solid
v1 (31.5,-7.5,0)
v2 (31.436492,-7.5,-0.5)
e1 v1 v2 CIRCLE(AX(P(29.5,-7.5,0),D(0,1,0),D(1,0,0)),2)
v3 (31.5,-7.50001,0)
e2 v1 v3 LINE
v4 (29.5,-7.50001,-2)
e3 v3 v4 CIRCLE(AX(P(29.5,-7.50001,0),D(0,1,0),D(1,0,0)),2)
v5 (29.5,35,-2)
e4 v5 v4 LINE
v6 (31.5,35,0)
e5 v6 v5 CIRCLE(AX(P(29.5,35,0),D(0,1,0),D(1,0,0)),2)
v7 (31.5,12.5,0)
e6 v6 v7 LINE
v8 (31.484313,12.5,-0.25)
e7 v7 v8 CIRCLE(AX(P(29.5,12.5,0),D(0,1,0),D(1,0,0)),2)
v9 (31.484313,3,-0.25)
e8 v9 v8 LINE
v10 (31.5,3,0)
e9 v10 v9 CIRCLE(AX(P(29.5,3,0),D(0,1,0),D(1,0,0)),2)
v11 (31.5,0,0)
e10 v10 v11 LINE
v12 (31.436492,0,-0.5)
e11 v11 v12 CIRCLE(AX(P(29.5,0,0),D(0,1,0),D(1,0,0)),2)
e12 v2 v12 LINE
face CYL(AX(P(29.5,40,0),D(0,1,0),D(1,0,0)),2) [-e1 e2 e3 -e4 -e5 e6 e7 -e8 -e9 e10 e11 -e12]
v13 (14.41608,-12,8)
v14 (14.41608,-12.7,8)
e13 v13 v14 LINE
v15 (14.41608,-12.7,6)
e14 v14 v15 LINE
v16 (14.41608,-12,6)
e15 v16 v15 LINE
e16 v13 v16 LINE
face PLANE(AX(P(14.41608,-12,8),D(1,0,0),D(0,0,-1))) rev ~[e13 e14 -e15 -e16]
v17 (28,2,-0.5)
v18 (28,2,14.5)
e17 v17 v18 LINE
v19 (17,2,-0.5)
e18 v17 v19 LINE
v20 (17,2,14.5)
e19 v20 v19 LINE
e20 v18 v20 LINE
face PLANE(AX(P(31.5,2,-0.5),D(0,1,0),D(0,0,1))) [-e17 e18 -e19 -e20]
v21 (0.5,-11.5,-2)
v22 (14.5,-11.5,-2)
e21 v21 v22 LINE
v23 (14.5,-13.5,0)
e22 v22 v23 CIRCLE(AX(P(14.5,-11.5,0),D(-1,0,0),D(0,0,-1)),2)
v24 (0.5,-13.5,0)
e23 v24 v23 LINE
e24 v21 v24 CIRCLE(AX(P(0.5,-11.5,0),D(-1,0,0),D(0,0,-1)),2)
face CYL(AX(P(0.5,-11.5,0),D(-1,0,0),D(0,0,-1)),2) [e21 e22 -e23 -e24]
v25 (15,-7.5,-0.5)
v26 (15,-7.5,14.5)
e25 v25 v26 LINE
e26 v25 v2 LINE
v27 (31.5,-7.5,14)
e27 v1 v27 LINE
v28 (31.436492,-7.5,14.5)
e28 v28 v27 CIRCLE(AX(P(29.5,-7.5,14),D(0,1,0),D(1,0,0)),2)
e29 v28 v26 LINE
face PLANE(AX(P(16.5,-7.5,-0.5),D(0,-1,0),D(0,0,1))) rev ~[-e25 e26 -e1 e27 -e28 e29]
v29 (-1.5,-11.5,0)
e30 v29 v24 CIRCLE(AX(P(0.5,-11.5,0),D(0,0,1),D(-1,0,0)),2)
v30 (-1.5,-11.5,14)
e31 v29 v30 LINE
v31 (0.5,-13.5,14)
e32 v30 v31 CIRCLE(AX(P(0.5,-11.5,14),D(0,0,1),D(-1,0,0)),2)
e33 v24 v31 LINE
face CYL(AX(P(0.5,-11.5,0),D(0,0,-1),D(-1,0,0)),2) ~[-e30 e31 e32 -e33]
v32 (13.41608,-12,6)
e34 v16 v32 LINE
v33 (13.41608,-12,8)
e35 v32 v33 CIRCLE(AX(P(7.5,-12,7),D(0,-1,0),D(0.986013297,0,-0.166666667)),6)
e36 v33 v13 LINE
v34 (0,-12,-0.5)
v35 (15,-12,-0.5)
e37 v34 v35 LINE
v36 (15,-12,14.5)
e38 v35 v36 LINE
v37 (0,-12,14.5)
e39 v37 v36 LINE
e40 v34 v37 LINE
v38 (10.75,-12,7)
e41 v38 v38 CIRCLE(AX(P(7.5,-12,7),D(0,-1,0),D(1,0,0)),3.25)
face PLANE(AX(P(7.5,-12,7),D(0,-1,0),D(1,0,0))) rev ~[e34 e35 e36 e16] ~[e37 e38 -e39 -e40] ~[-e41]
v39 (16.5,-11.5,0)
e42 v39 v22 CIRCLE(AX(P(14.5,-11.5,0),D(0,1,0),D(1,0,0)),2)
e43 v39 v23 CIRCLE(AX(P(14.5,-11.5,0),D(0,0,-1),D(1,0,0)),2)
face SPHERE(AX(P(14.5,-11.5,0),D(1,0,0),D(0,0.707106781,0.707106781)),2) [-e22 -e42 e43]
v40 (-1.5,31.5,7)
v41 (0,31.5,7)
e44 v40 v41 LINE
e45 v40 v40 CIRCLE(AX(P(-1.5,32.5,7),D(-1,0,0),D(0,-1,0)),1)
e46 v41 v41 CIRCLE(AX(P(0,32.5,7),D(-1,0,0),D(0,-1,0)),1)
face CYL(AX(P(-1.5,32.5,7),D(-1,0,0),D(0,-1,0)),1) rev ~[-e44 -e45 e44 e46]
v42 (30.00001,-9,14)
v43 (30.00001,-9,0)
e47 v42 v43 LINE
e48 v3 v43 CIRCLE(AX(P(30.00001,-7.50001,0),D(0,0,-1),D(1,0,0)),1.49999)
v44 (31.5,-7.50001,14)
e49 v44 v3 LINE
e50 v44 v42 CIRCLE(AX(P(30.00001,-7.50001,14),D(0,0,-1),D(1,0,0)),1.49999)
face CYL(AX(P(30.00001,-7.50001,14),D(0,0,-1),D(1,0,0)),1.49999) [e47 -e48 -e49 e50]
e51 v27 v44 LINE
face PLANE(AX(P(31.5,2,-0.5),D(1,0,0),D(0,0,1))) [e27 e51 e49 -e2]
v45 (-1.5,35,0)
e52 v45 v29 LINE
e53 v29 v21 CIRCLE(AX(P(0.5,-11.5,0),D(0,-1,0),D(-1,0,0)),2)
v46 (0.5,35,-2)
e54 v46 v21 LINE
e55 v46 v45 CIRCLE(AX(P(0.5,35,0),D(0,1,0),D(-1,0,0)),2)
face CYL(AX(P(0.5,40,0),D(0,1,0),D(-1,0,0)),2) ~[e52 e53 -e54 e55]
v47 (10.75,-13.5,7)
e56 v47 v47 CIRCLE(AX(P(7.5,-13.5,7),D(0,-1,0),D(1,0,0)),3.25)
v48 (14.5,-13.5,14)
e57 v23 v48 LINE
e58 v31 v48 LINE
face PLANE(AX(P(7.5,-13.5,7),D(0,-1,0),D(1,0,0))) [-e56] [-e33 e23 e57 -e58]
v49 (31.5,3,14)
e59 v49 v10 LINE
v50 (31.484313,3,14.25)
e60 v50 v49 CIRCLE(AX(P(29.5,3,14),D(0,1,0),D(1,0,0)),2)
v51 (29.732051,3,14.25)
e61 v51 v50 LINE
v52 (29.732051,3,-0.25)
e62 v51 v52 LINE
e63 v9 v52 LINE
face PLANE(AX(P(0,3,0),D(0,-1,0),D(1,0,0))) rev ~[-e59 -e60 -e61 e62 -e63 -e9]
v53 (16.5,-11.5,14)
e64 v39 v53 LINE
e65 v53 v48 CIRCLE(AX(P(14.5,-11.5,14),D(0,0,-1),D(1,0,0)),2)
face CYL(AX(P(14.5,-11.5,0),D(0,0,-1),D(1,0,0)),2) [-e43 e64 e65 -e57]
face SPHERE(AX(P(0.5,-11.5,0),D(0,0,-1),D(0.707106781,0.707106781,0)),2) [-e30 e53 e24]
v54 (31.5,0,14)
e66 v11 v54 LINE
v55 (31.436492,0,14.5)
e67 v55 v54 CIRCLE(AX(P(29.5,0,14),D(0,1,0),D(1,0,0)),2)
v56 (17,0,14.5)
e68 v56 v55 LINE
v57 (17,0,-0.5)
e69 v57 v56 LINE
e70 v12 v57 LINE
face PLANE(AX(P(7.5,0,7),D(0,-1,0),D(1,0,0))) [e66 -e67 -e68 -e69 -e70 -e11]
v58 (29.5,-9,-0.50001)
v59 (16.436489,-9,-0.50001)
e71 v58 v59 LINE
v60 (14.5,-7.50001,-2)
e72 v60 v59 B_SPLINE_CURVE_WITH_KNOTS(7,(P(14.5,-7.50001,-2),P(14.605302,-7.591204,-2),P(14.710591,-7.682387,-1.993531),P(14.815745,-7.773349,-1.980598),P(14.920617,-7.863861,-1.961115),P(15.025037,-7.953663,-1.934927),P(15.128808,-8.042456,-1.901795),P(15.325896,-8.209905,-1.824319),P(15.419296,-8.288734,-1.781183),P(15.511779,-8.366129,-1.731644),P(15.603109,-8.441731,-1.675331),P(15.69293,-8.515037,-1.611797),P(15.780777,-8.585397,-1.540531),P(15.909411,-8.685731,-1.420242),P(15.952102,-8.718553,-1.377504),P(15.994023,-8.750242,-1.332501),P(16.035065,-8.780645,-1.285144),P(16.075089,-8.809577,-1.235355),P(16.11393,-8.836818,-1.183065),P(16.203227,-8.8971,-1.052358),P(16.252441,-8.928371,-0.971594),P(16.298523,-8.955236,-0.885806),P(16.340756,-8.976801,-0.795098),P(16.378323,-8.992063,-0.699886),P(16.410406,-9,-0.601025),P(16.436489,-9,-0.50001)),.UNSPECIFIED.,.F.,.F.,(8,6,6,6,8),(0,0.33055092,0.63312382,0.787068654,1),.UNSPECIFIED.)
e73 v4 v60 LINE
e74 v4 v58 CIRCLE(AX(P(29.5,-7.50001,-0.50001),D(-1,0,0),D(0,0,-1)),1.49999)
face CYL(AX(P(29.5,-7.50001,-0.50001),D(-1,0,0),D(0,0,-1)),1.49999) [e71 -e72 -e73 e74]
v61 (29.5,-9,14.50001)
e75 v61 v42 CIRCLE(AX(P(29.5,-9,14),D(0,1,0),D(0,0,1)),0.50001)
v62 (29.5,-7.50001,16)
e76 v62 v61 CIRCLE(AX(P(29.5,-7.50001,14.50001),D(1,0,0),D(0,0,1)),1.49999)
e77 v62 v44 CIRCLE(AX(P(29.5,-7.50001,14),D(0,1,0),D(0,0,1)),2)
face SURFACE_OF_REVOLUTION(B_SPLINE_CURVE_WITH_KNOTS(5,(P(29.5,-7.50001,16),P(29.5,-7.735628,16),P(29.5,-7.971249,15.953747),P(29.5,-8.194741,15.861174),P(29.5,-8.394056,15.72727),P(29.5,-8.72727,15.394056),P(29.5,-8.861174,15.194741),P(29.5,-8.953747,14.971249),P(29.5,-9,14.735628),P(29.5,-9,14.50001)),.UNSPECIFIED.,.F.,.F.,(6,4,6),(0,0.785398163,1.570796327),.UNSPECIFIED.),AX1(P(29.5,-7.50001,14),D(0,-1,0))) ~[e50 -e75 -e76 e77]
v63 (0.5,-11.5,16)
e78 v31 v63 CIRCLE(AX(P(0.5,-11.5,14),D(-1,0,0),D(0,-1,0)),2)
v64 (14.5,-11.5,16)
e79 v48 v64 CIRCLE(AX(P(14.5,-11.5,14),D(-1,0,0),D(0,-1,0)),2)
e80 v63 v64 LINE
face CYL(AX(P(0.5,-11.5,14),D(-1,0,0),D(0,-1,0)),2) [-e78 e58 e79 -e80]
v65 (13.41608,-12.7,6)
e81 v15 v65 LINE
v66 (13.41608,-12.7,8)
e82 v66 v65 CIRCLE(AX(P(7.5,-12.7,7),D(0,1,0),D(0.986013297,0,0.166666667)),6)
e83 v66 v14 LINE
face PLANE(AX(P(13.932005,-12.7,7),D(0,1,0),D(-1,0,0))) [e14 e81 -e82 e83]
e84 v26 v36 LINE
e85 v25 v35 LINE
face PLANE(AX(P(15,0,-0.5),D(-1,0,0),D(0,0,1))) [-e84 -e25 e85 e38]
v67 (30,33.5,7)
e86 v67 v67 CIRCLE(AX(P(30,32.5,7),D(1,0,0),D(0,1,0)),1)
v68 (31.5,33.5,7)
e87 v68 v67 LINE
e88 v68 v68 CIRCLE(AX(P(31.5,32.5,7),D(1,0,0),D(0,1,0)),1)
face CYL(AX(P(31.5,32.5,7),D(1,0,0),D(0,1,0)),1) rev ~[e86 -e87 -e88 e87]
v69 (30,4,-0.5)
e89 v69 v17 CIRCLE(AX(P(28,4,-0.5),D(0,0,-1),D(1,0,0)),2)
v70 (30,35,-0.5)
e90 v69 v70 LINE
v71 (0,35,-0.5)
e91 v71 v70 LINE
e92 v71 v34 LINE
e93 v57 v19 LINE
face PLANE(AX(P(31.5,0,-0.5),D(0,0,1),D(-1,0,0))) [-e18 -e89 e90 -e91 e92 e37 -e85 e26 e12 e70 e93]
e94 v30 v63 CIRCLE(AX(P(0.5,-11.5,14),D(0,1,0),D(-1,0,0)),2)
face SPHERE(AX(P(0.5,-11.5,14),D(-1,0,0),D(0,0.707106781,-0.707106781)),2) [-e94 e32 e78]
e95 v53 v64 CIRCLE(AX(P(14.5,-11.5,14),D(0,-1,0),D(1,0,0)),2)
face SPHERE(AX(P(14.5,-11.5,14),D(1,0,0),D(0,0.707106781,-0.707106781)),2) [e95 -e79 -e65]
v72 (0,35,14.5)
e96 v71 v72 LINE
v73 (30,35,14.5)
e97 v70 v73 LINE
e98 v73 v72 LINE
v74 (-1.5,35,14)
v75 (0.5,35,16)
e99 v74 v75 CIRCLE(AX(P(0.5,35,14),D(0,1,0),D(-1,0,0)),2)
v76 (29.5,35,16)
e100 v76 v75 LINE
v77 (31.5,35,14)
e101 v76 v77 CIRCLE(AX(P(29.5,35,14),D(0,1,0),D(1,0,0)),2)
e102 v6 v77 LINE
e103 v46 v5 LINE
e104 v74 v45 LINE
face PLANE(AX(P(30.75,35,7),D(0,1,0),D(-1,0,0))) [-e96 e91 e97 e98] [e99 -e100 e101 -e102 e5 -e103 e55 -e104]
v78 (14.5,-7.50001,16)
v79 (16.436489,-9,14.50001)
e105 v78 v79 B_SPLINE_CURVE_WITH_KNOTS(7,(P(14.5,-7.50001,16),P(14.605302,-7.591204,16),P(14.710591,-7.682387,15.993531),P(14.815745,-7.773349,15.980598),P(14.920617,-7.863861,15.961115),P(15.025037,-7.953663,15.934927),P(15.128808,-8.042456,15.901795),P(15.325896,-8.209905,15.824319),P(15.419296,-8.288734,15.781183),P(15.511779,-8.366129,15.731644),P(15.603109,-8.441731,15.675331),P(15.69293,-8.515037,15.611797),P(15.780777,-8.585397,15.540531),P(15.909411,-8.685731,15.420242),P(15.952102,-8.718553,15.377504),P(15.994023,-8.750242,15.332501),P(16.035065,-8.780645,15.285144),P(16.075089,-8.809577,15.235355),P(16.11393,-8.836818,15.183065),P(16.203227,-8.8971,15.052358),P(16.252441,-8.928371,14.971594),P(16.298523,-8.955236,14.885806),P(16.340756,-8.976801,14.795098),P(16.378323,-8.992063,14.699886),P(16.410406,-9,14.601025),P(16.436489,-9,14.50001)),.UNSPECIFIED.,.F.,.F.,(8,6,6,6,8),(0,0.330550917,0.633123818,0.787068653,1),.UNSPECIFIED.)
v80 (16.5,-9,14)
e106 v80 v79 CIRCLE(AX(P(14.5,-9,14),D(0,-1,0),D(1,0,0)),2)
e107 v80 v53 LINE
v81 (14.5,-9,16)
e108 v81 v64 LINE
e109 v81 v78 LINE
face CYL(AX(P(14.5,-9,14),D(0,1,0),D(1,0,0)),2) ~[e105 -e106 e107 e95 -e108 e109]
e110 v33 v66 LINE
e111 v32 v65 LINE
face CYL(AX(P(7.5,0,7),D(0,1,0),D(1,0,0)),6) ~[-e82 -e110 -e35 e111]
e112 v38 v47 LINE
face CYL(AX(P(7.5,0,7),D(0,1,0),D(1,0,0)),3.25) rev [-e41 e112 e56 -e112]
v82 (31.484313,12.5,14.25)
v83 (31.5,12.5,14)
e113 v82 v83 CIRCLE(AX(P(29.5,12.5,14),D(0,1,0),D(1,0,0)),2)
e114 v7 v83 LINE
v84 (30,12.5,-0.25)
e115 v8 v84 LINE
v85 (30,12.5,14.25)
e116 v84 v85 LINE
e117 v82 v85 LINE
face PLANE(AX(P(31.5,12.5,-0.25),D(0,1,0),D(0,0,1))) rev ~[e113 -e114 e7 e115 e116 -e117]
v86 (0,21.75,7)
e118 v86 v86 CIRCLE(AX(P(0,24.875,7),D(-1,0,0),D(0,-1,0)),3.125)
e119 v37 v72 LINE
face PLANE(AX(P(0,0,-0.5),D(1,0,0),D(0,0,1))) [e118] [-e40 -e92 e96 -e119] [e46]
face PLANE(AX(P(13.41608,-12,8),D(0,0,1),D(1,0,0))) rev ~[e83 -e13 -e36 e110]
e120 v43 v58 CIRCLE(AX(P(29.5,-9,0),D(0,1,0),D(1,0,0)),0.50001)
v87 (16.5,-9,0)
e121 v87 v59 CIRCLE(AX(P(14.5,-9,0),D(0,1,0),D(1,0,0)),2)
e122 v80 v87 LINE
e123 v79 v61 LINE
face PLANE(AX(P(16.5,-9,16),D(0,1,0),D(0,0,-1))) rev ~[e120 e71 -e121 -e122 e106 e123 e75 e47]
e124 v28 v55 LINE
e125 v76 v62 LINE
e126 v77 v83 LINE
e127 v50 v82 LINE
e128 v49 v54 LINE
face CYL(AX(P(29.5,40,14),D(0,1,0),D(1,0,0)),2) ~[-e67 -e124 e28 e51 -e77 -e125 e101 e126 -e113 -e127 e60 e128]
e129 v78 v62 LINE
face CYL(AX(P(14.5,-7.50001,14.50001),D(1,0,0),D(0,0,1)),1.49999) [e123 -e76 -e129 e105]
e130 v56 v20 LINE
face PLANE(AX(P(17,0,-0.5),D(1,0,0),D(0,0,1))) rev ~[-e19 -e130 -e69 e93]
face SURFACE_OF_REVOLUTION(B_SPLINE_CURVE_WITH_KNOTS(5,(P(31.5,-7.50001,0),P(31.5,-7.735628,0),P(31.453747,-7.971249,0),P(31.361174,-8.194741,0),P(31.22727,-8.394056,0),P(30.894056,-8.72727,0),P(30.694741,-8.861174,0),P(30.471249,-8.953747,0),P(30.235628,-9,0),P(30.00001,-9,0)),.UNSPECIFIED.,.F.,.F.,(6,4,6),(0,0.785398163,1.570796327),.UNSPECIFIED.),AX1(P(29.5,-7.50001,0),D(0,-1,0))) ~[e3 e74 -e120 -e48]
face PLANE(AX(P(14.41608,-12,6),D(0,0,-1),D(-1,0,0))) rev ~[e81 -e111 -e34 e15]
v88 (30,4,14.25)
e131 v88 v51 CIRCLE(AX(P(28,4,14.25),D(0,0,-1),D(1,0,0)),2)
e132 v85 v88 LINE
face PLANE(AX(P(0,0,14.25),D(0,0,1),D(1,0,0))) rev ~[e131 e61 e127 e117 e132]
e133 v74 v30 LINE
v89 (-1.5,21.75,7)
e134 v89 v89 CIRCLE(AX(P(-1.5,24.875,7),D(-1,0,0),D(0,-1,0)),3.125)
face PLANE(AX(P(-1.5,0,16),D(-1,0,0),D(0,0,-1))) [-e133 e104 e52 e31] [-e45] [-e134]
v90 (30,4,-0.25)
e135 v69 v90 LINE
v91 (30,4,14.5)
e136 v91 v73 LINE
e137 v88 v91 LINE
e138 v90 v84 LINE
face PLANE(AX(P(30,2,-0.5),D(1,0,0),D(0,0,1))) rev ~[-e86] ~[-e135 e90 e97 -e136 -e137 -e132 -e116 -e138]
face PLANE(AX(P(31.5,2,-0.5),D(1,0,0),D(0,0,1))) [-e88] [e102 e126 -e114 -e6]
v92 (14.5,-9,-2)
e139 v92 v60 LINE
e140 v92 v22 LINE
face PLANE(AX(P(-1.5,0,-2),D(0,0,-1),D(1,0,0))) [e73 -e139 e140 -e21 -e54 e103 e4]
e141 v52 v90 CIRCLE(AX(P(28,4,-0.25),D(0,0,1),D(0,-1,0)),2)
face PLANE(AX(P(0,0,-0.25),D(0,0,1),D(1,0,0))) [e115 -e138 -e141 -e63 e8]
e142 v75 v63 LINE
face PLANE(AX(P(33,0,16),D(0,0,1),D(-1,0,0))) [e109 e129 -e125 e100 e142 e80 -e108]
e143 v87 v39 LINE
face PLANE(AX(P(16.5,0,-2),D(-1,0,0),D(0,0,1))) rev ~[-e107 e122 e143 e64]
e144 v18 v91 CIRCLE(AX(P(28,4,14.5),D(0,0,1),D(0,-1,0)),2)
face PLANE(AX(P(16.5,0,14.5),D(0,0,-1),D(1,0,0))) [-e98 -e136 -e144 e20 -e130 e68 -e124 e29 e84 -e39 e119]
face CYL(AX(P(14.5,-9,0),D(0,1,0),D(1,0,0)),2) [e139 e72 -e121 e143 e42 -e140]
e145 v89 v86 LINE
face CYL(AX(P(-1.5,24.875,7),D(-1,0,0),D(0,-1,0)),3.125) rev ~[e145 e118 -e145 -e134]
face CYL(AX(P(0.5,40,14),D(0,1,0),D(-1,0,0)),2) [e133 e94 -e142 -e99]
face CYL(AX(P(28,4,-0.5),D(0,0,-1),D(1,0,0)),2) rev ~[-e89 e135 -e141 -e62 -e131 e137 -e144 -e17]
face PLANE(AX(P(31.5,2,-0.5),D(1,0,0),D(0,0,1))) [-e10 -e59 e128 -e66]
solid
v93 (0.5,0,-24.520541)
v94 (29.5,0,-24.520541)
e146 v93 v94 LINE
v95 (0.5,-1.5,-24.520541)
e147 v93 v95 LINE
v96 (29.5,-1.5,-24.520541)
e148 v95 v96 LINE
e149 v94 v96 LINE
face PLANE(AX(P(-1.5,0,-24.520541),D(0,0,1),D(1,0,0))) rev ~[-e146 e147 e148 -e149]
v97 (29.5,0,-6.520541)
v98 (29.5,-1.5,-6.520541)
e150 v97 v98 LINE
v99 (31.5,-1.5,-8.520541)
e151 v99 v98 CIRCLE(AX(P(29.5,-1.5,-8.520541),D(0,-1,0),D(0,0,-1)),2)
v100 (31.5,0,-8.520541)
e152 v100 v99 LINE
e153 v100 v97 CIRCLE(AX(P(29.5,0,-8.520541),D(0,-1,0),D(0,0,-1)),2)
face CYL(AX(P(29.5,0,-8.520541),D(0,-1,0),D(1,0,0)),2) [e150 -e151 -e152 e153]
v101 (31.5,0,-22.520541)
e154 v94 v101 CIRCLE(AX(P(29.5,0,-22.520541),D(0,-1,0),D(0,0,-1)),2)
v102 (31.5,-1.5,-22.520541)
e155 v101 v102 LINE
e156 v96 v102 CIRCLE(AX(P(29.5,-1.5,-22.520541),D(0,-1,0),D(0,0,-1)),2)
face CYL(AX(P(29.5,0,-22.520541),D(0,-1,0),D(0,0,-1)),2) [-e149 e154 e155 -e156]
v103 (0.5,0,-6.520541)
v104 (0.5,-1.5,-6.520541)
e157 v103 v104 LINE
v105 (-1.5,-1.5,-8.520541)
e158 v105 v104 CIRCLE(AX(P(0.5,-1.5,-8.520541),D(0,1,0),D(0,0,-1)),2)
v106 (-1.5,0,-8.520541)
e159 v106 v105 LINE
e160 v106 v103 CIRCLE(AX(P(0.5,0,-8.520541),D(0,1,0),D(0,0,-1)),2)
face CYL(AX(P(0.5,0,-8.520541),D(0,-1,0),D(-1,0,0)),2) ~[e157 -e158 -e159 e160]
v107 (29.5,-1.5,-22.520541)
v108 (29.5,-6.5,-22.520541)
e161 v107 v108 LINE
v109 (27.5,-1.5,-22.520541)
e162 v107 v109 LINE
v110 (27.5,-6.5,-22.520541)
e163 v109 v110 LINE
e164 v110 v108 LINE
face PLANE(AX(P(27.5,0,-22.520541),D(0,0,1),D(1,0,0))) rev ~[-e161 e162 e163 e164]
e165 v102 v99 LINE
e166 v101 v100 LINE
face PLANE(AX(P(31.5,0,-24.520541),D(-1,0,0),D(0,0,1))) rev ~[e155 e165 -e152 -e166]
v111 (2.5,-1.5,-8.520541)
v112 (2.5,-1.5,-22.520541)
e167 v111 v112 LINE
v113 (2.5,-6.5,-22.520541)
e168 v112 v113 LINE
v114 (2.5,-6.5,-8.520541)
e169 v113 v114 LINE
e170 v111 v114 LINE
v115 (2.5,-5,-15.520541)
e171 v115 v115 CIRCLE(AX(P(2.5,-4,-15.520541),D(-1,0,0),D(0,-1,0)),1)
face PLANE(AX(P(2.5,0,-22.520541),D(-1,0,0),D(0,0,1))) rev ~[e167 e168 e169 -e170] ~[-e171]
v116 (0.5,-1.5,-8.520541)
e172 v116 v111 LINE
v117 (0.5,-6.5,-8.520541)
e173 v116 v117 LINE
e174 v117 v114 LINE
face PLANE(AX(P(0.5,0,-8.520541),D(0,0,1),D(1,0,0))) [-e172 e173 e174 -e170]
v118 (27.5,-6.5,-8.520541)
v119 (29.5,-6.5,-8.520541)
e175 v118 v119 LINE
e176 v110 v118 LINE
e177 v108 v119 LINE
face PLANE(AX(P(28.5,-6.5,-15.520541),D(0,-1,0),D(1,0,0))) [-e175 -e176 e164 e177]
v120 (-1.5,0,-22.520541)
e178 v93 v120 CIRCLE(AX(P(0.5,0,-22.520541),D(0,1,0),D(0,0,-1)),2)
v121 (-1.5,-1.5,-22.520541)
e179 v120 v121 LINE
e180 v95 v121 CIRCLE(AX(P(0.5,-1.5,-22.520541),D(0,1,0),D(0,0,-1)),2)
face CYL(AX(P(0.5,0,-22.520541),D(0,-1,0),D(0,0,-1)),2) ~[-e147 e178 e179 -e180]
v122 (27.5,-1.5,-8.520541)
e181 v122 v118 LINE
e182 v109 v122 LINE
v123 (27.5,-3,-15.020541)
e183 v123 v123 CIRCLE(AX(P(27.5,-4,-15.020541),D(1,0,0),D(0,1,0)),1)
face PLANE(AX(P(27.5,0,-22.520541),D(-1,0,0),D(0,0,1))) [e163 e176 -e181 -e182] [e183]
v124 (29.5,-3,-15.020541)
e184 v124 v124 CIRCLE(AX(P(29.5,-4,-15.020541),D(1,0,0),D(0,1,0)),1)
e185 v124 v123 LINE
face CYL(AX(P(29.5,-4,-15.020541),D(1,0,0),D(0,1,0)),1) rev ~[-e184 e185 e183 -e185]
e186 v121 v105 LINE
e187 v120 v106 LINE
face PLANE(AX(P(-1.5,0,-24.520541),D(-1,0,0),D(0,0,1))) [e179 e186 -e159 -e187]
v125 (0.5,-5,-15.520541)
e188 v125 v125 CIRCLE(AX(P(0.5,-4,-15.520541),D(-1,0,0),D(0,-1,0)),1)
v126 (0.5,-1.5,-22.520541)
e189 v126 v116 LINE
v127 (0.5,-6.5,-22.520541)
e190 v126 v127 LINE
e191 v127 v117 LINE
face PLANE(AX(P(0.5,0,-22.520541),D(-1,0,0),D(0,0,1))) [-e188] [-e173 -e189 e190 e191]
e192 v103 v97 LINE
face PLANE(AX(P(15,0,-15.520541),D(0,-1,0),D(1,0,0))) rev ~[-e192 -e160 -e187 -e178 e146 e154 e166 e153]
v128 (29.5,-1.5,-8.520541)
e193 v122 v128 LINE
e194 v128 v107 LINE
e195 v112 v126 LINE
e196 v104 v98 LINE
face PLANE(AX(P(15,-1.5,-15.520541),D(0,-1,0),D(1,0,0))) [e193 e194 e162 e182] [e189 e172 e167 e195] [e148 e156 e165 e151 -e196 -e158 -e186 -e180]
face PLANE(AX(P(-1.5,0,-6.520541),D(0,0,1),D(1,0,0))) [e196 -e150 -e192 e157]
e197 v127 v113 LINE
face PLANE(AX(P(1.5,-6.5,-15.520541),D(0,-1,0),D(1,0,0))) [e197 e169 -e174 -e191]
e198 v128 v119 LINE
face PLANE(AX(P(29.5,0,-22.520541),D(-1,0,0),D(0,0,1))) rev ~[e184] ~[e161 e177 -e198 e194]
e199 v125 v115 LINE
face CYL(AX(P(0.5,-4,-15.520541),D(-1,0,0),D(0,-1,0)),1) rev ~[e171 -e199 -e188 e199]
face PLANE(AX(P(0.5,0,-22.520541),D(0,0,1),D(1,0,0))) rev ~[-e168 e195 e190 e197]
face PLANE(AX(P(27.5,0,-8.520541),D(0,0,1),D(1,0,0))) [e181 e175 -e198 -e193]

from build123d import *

# Parameters (mm, degrees)
F0_W          = 15
F0_H          = 15
F1_DEPTH      = 13.5
F0_R          = 6
F2_DEPTH      = 13.5
F0_R_2        = 4.5
F3_DEPTH      = 12
F5_DEPTH      = 15
F6_DEPTH      = 1.5
F7_DEPTH      = 35
F8_W          = 1.5
F8_H          = 15
F9_DEPTH      = 15
F10_W         = 2
F10_H         = 15
F11_DEPTH     = 15
F13_DEPTH     = 35
F14_W         = 1.5
F14_H         = 15
F15_DEPTH     = 33
F16_W         = 33
F16_H         = 18
F17_DEPTH     = 1.5
F16_W_2       = 2
F16_H_2       = 14
F18_DEPTH     = 6.5
F20_R         = 1
F21_DEPTH     = 1.5
F22_R         = 1
F23_DEPTH     = 1.5
F20_R_2       = 3.125
F24_DEPTH     = 1.5
F26_DEPTH     = 0.7
F27_R         = 1
F28_DEPTH     = 2
F29_DEPTH     = 5
F30_DEPTH     = 2
F32_DEPTH     = 13.5
F33_DEPTH     = 12
F0_R_3        = 3.25
F34_DEPTH     = 13.5
F35_DEPTH     = 12
F37_DEPTH     = 1.5
F38_T4_DEPTH  = 15
F38_T10_DEPTH = 15
F38_T16_DEPTH = 15
F38_T23_DEPTH = 15
F38_T29_DEPTH = 15
F38_T32_DEPTH = 2.5
F38_T34_DEPTH = 14
F38_T36_DEPTH = 14
F38_T38_DEPTH = 51.5
F38_T40_DEPTH = 54
F38_S44_W     = 2
F38_S44_H     = 2
F38_T45_DEPTH = 2
F38_S50_W     = 2
F38_S50_H     = 2
F38_T51_DEPTH = 2
F38_S56_W     = 2
F38_S56_H     = 2
F38_T57_DEPTH = 2
F38_S62_W     = 2
F38_S62_H     = 2
F38_T63_DEPTH = 2
F38_2_F1_R    = 2
F38_2_F2_R    = 2
F38_2_F3_R    = 2
F38_2_F4_R    = 2
F19_R         = 1
F40_DEPTH     = 2
F42_R         = 1.49999


# Not quite as in the source:
# - a fillet or chamfer that OpenCascade refuses, or shapes differently, is made with other operations: its cross-section is extruded or revolved along the edge and cut away or added
# - two fillets or chamfers of one size are made in one step
# - a fillet or chamfer is up to 0.001 mm smaller than in the source, because OpenCascade refuses the exact size
# - a feature names something its author has since deleted; it is built from what else it names


with BuildPart() as f1:
    # F0 (on Front) → F1 (new body)
    with BuildSketch(Plane.XZ):
        Polygon((16.5, 14.5), (16.5, 16), (-1.5, 16), (-1.5, -2), (16.5, -2), (16.5, -0.5), align=None)
        with Locations((7.5, 7)):
            Rectangle(F0_W, F0_H, mode=Mode.SUBTRACT)
    extrude(amount=F1_DEPTH)

    # F0 (on Front) → F2 (join)
    with BuildSketch(Plane.XZ):
        with Locations((7.5, 7)):
            Rectangle(F0_W, F0_H)
        with Locations((7.5, 7)):
            Circle(F0_R, mode=Mode.SUBTRACT)
    extrude(amount=F2_DEPTH)

    # F0 (on Front) → F3 (cut)
    with BuildSketch(Plane.XZ):
        with Locations((7.5, 7)):
            Rectangle(F0_W, F0_H)
        with Locations((7.5, 7)):
            Circle(F0_R, mode=Mode.SUBTRACT)
        with Locations((7.5, 7)):
            Circle(F0_R)
        with Locations((7.5, 7)):
            Circle(F0_R_2, mode=Mode.SUBTRACT)
    extrude(amount=F3_DEPTH, mode=Mode.SUBTRACT)

    # F4 (on face) → F5 (join)
    with BuildSketch(Plane.YZ.offset(16.5)):
        Polygon((0, -2), (0, -0.5), (-7.5, -0.5), (-7.5, 14.5), (0, 14.5), (0, 16), (-9, 16), (-9, -2), align=None)
    extrude(amount=F5_DEPTH)

    # F6 (cut): a face of the model
    f6_faces = [f1.faces().sort_by_distance(p)[0] for p in [
        (16.5, -3.75, 7),
    ]]
    extrude(f6_faces, amount=-F6_DEPTH, mode=Mode.SUBTRACT)

    # F0 (on Front) → F7 (join)
    with BuildSketch(Plane.XZ):
        Polygon((16.5, 14.5), (16.5, 16), (-1.5, 16), (-1.5, -2), (16.5, -2), (16.5, -0.5), align=None)
        with Locations((7.5, 7)):
            Rectangle(F0_W, F0_H, mode=Mode.SUBTRACT)
        Polygon((33, 16), (16.5, 16), (16.5, 14.5), (31.5, 14.5), (31.5, -0.5), (16.5, -0.5), (16.5, -2), (33, -2), align=None)
    extrude(amount=-F7_DEPTH)

    # F8 (on face) → F9 (cut)
    with BuildSketch(Plane(origin=(0, 35, 0), x_dir=(-1, 0, 0), z_dir=(0, 1, 0))):
        with Locations((-15.75, 7)):
            Rectangle(F8_W, F8_H)
    extrude(amount=-F9_DEPTH, mode=Mode.SUBTRACT)

    # F10 (on face) → F11 (join)
    with BuildSketch(Plane(origin=(31.5, 0, 0), x_dir=(0, -1, 0), z_dir=(-1, 0, 0))):
        with Locations((-1, 7)):
            Rectangle(F10_W, F10_H)
    extrude(amount=F11_DEPTH)

    # F12 (on face) → F13 (cut)
    with BuildSketch(Plane(origin=(0, 35, 0), x_dir=(-1, 0, 0), z_dir=(0, 1, 0))):
        Polygon((-31.5, -2), (-31.5, -0.5), (-31.5, 14.5), (-31.5, 16), (-33, 16), (-33, -2), align=None)
    extrude(amount=-F13_DEPTH, mode=Mode.SUBTRACT)

    # F14 (on face) → F15 (join)
    with BuildSketch(Plane(origin=(0, 2, 0), x_dir=(-1, 0, 0), z_dir=(0, 1, 0))):
        with Locations((-30.75, 7)):
            Rectangle(F14_W, F14_H)
    extrude(amount=F15_DEPTH)

    # F20 (on face) → F21 (cut)
    with BuildSketch(Plane(origin=(-1.5, 0, 0), x_dir=(0, -1, 0), z_dir=(-1, 0, 0))):
        with Locations((-32.5, 7)):
            Circle(F20_R)
    extrude(amount=-F21_DEPTH, mode=Mode.SUBTRACT)

    # F22 (on face) → F23 (cut)
    with BuildSketch(Plane.YZ.offset(31.5)):
        with Locations((32.5, 7)):
            Circle(F22_R)
    extrude(amount=-F23_DEPTH, mode=Mode.SUBTRACT)

    # F20 (on face) → F24 (cut)
    with BuildSketch(Plane(origin=(-1.5, 0, 0), x_dir=(0, -1, 0), z_dir=(-1, 0, 0))):
        with Locations((-24.875, 7)):
            Circle(F20_R_2)
    extrude(amount=-F24_DEPTH, mode=Mode.SUBTRACT)

    # F25 (on face) → F26 (cut)
    with BuildSketch(Plane(origin=(0, -12, 0), x_dir=(-1, 0, 0), z_dir=(0, 1, 0))):
        with BuildLine():
            Line((-14.4160797831, 6), (-13.4160797831, 6))
            ThreePointArc((-13.4160797831, 6), (-13.5, 7), (-13.4160797831, 8))
            Line((-13.4160797831, 8), (-14.4160797831, 8))
            Line((-14.4160797831, 8), (-14.4160797831, 7))
            Line((-14.4160797831, 7), (-14.4160797831, 6))
        make_face()
    extrude(amount=-F26_DEPTH, mode=Mode.SUBTRACT)

    # F29 (cut): a face of the model
    f29_faces = [f1.faces().sort_by_distance(p)[0] for p in [
        (15.75, 20, 7),
    ]]
    extrude(f29_faces, amount=-F29_DEPTH, mode=Mode.SUBTRACT)

    # F30 (cut): a face of the model
    f30_faces = [f1.faces().sort_by_distance(p)[0] for p in [
        (15, 7.5, 7),
    ]]
    extrude(f30_faces, amount=-F30_DEPTH, mode=Mode.SUBTRACT)

    # F31: union 

    # F0 (on Front) → F32 (join)
    with BuildSketch(Plane.XZ):
        with Locations((7.5, 7)):
            Circle(F0_R)
        with Locations((7.5, 7)):
            Circle(F0_R_2, mode=Mode.SUBTRACT)
    extrude(amount=F32_DEPTH)

    # F0 (on Front) → F33 (cut)
    with BuildSketch(Plane.XZ):
        with Locations((7.5, 7)):
            Circle(F0_R)
        with Locations((7.5, 7)):
            Circle(F0_R_2, mode=Mode.SUBTRACT)
    extrude(amount=F33_DEPTH, mode=Mode.SUBTRACT)

    # F0 (on Front) → F34 (join)
    with BuildSketch(Plane.XZ):
        with Locations((7.5, 7)):
            Circle(F0_R_2)
        with Locations((7.5, 7)):
            Circle(F0_R_3, mode=Mode.SUBTRACT)
    extrude(amount=F34_DEPTH)

    # F0 (on Front) → F35 (cut)
    with BuildSketch(Plane.XZ):
        with Locations((7.5, 7)):
            Circle(F0_R_2)
        with Locations((7.5, 7)):
            Circle(F0_R_3, mode=Mode.SUBTRACT)
    extrude(amount=F35_DEPTH, mode=Mode.SUBTRACT)

    # F36 (on face) → F37 (cut)
    with BuildSketch(Plane.YZ.offset(31.5)):
        Polygon((3, 14.25), (3, 7), (3, -0.25), (7.75, -0.25), (12.5, -0.25), (12.5, 7), (12.5, 14.25), (7.75, 14.25), align=None)
    extrude(amount=-F37_DEPTH, mode=Mode.SUBTRACT)

    # F38: fillet of radius 2 on 11 edges, made by hand


with BuildPart() as f17:
    # F16 (on Front) → F17 (new body)
    with BuildSketch(Plane.XZ):
        with Locations((15, -15.5205413848)):
            Rectangle(F16_W, F16_H)
        Polygon((29.5, -23.0205413848), (0.5, -23.0205413848), (0, -23.0205413848), (0, -8.0205413848), (0.5, -8.0205413848), (29.5, -8.0205413848), (30, -8.0205413848), (30, -23.0205413848), align=None, mode=Mode.SUBTRACT)
        Polygon((0.5, -22.5205413848), (0.5, -23.0205413848), (29.5, -23.0205413848), (29.5, -22.5205413848), (27.5, -22.5205413848), (27.5, -8.5205413848), (29.5, -8.5205413848), (29.5, -8.0205413848), (0.5, -8.0205413848), (0.5, -8.5205413848), (2.5, -8.5205413848), (2.5, -22.5205413848), align=None)
        Polygon((29.5, -22.5205413848), (29.5, -23.0205413848), (30, -23.0205413848), (30, -8.0205413848), (29.5, -8.0205413848), (29.5, -8.5205413848), align=None)
        Polygon((0, -23.0205413848), (0.5, -23.0205413848), (0.5, -22.5205413848), (0.5, -8.5205413848), (0.5, -8.0205413848), (0, -8.0205413848), align=None)
    extrude(amount=F17_DEPTH)

    # F16 (on Front) → F18 (join)
    with BuildSketch(Plane.XZ):
        with Locations((1.5, -15.5205413848)):
            Rectangle(F16_W_2, F16_H_2)
        with Locations((28.5, -15.5205413848)):
            Rectangle(F16_W_2, F16_H_2)
    extrude(amount=F18_DEPTH)

    # F27 (on face) → F28 (cut)
    with BuildSketch(Plane(origin=(0.5, 0, 0), x_dir=(0, -1, 0), z_dir=(-1, 0, 0))):
        with Locations((4, -15.5205413848)):
            Circle(F27_R)
    extrude(amount=-F28_DEPTH, mode=Mode.SUBTRACT)

    # F38#2: fillet of radius 2 on 4 edges, made by hand

    # F38_2_f1
    f38_2_f1_edges = [f17.edges().sort_by_distance(p)[0] for p in [
        (31.5, -0.75, -24.5205413848),
    ]]
    fillet(f38_2_f1_edges, radius=F38_2_F1_R)

    # F38_2_f2
    f38_2_f2_edges = [f17.edges().sort_by_distance(p)[0] for p in [
        (31.5, -0.75, -6.5205413848),
    ]]
    fillet(f38_2_f2_edges, radius=F38_2_F2_R)

    # F38_2_f3
    f38_2_f3_edges = [f17.edges().sort_by_distance(p)[0] for p in [
        (-1.5, -0.75, -24.5205413848),
    ]]
    fillet(f38_2_f3_edges, radius=F38_2_F3_R)

    # F38_2_f4
    f38_2_f4_edges = [f17.edges().sort_by_distance(p)[0] for p in [
        (-1.5, -0.75, -6.5205413848),
    ]]
    fillet(f38_2_f4_edges, radius=F38_2_F4_R)

    # F19 (on face) → F40 (cut)
    with BuildSketch(Plane.YZ.offset(29.5)):
        with Locations((-4, -15.0205413848)):
            Circle(F19_R)
    extrude(amount=-F40_DEPTH, mode=Mode.SUBTRACT)


with BuildPart() as f38_tool2:
    # F38_s3 → F38_t4 (new body)
    with BuildSketch(Plane.XY.offset(-0.5)):
        with BuildLine():
            ThreePointArc((30, 4), (29.4142135624, 2.5857864376), (28, 2))
            Line((28, 2), (30, 2))
            Line((30, 2), (30, 4))
        make_face()
    extrude(amount=F38_T4_DEPTH)

    split(bisect_by=Plane.XZ.offset(-3), keep=Keep.BOTTOM)

    split(bisect_by=Plane.XY.offset(-0.25), keep=Keep.BOTTOM)


with BuildPart() as f1_1:
    add(f1.part)

    # F38_t1: union F38_tool2
    add(f38_tool2.part)


with BuildPart() as f38_tool8:
    # F38_s9 → F38_t10 (new body)
    with BuildSketch(Plane.XY.offset(-0.5)):
        with BuildLine():
            ThreePointArc((30, 4), (29.4142135624, 2.5857864376), (28, 2))
            Line((28, 2), (30, 2))
            Line((30, 2), (30, 4))
        make_face()
    extrude(amount=F38_T10_DEPTH)

    split(bisect_by=Plane.XZ.offset(-3), keep=Keep.TOP)

    split(bisect_by=Plane.XY.offset(-0.25), keep=Keep.BOTTOM)


with BuildPart() as f1_2:
    add(f1_1.part)

    # F38_t7: union F38_tool8
    add(f38_tool8.part)


with BuildPart() as f38_tool14:
    # F38_s15 → F38_t16 (new body)
    with BuildSketch(Plane.XY.offset(-0.5)):
        with BuildLine():
            ThreePointArc((30, 4), (29.4142135624, 2.5857864376), (28, 2))
            Line((28, 2), (30, 2))
            Line((30, 2), (30, 4))
        make_face()
    extrude(amount=F38_T16_DEPTH)

    split(bisect_by=Plane.XZ.offset(-3), keep=Keep.TOP)

    split(bisect_by=Plane.XY.offset(-0.25), keep=Keep.TOP)

    split(bisect_by=Plane.XY.offset(14.25), keep=Keep.BOTTOM)


with BuildPart() as f1_3:
    add(f1_2.part)

    # F38_t13: union F38_tool14
    add(f38_tool14.part)


with BuildPart() as f38_tool21:
    # F38_s22 → F38_t23 (new body)
    with BuildSketch(Plane.XY.offset(-0.5)):
        with BuildLine():
            ThreePointArc((30, 4), (29.4142135624, 2.5857864376), (28, 2))
            Line((28, 2), (30, 2))
            Line((30, 2), (30, 4))
        make_face()
    extrude(amount=F38_T23_DEPTH)

    split(bisect_by=Plane.XZ.offset(-3), keep=Keep.BOTTOM)

    split(bisect_by=Plane.XY.offset(14.25), keep=Keep.TOP)


with BuildPart() as f1_4:
    add(f1_3.part)

    # F38_t20: union F38_tool21
    add(f38_tool21.part)


with BuildPart() as f38_tool27:
    # F38_s28 → F38_t29 (new body)
    with BuildSketch(Plane.XY.offset(-0.5)):
        with BuildLine():
            ThreePointArc((30, 4), (29.4142135624, 2.5857864376), (28, 2))
            Line((28, 2), (30, 2))
            Line((30, 2), (30, 4))
        make_face()
    extrude(amount=F38_T29_DEPTH)

    split(bisect_by=Plane.XZ.offset(-3), keep=Keep.TOP)

    split(bisect_by=Plane.XY.offset(14.25), keep=Keep.TOP)


with BuildPart() as f1_5:
    add(f1_4.part)

    # F38_t26: union F38_tool27
    add(f38_tool27.part)

    # F38_s33 → F38_t32 (cut)
    with BuildSketch(Plane.XZ.offset(9)):
        with BuildLine():
            ThreePointArc((16.5, 14), (15.9142135624, 15.4142135624), (14.5, 16))
            Line((14.5, 16), (16.5, 16))
            Line((16.5, 16), (16.5, 14))
        make_face()
        with BuildLine():
            ThreePointArc((16.5, 0), (15.9142135624, -1.4142135624), (14.5, -2))
            Line((14.5, -2), (16.5, -2))
            Line((16.5, -2), (16.5, 0))
        make_face()
    extrude(amount=F38_T32_DEPTH, mode=Mode.SUBTRACT)

    # F38_s35 → F38_t34 (cut)
    with BuildSketch(Plane.XY):
        with BuildLine():
            ThreePointArc((16.5, -11.5), (15.9142135624, -12.9142135624), (14.5, -13.5))
            Line((14.5, -13.5), (16.5, -13.5))
            Line((16.5, -13.5), (16.5, -11.5))
        make_face()
        with BuildLine():
            ThreePointArc((-1.5, -11.5), (-0.9142135624, -12.9142135624), (0.5, -13.5))
            Line((0.5, -13.5), (-1.5, -13.5))
            Line((-1.5, -13.5), (-1.5, -11.5))
        make_face()
    extrude(amount=F38_T34_DEPTH, mode=Mode.SUBTRACT)

    # F38_s37 → F38_t36 (cut)
    with BuildSketch(Plane.YZ.offset(0.5)):
        with BuildLine():
            ThreePointArc((-13.5, 14), (-12.9142135624, 15.4142135624), (-11.5, 16))
            Line((-11.5, 16), (-13.5, 16))
            Line((-13.5, 16), (-13.5, 14))
        make_face()
        with BuildLine():
            ThreePointArc((-11.5, -2), (-12.9142135624, -1.4142135624), (-13.5, 0))
            Line((-13.5, 0), (-13.5, -2))
            Line((-13.5, -2), (-11.5, -2))
        make_face()
    extrude(amount=F38_T36_DEPTH, mode=Mode.SUBTRACT)

    # F38_s39 → F38_t38 (cut)
    with BuildSketch(Plane.XZ.offset(-40)):
        with BuildLine():
            ThreePointArc((-1.5, 14), (-0.9142135624, 15.4142135624), (0.5, 16))
            Line((0.5, 16), (-1.5, 16))
            Line((-1.5, 16), (-1.5, 14))
        make_face()
        with BuildLine():
            ThreePointArc((-1.5, 0), (-0.9142135624, -1.4142135624), (0.5, -2))
            Line((0.5, -2), (-1.5, -2))
            Line((-1.5, -2), (-1.5, 0))
        make_face()
    extrude(amount=F38_T38_DEPTH, mode=Mode.SUBTRACT)

    # F38_s41 → F38_t40 (cut)
    with BuildSketch(Plane.XZ.offset(-40)):
        with BuildLine():
            ThreePointArc((31.5, 14), (30.9142135624, 15.4142135624), (29.5, 16))
            Line((29.5, 16), (31.5, 16))
            Line((31.5, 16), (31.5, 14))
        make_face()
        with BuildLine():
            ThreePointArc((31.5, 0), (30.9142135624, -1.4142135624), (29.5, -2))
            Line((29.5, -2), (31.5, -2))
            Line((31.5, -2), (31.5, 0))
        make_face()
    extrude(amount=F38_T40_DEPTH, mode=Mode.SUBTRACT)


with BuildPart() as f38_tool43:
    # F38_s44 → F38_t45 (new body)
    with BuildSketch(Plane.YZ.offset(14.5)):
        with Locations((-12.5, 15)):
            Rectangle(F38_S44_W, F38_S44_H)
    extrude(amount=F38_T45_DEPTH)

    # F38_s46 → F38_t47 (revolve, cut)
    with BuildSketch(Plane(origin=(14.5, -11.5, 14), x_dir=(0, 0.7071067812, -0.7071067812), z_dir=(0, -0.7071067812, -0.7071067812))):
        with BuildLine():
            ThreePointArc((0, -2), (2, 0), (0, 2))
            Line((0, 2), (0, -2))
        make_face()
    revolve(axis=Axis((14.5, -11.5, 14), (1, 0, 0)), mode=Mode.SUBTRACT)


with BuildPart() as f1_6:
    add(f1_5.part)

    # F38_t42: cut F38_tool43
    add(f38_tool43.part, mode=Mode.SUBTRACT)


with BuildPart() as f38_tool49:
    # F38_s50 → F38_t51 (new body)
    with BuildSketch(Plane.YZ.offset(14.5)):
        with Locations((-12.5, -1)):
            Rectangle(F38_S50_W, F38_S50_H)
    extrude(amount=F38_T51_DEPTH)

    # F38_s52 → F38_t53 (revolve, cut)
    with BuildSketch(Plane(origin=(14.5, -11.5, 0), x_dir=(0, 0.7071067812, 0.7071067812), z_dir=(0, 0.7071067812, -0.7071067812))):
        with BuildLine():
            ThreePointArc((0, -2), (2, 0), (0, 2))
            Line((0, 2), (0, -2))
        make_face()
    revolve(axis=Axis((14.5, -11.5, 0), (1, 0, 0)), mode=Mode.SUBTRACT)


with BuildPart() as f1_7:
    add(f1_6.part)

    # F38_t48: cut F38_tool49
    add(f38_tool49.part, mode=Mode.SUBTRACT)


with BuildPart() as f38_tool55:
    # F38_s56 → F38_t57 (new body)
    with BuildSketch(Plane.YZ.offset(0.5)):
        with Locations((-12.5, 15)):
            Rectangle(F38_S56_W, F38_S56_H)
    extrude(amount=-F38_T57_DEPTH)

    # F38_s58 → F38_t59 (revolve, cut)
    with BuildSketch(Plane(origin=(0.5, -11.5, 14), x_dir=(0, 0.7071067812, -0.7071067812), z_dir=(0, 0.7071067812, 0.7071067812))):
        with BuildLine():
            ThreePointArc((0, -2), (2, 0), (0, 2))
            Line((0, 2), (0, -2))
        make_face()
    revolve(axis=Axis((0.5, -11.5, 14), (-1, 0, 0)), mode=Mode.SUBTRACT)


with BuildPart() as f1_8:
    add(f1_7.part)

    # F38_t54: cut F38_tool55
    add(f38_tool55.part, mode=Mode.SUBTRACT)


with BuildPart() as f38_tool61:
    # F38_s62 → F38_t63 (new body)
    with BuildSketch(Plane.XY):
        with Locations((-0.5, -12.5)):
            Rectangle(F38_S62_W, F38_S62_H)
    extrude(amount=-F38_T63_DEPTH)

    # F38_s64 → F38_t65 (revolve, cut)
    with BuildSketch(Plane(origin=(0.5, -11.5, 0), x_dir=(0.7071067812, 0.7071067812, 0), z_dir=(-0.7071067812, 0.7071067812, 0))):
        with BuildLine():
            ThreePointArc((0, -2), (2, 0), (0, 2))
            Line((0, 2), (0, -2))
        make_face()
    revolve(axis=Axis((0.5, -11.5, 0), (0, 0, -1)), mode=Mode.SUBTRACT)


with BuildPart() as f1_9:
    add(f1_8.part)

    # F38_t60: cut F38_tool61
    add(f38_tool61.part, mode=Mode.SUBTRACT)

    # F42 (radius 1.5 in the source; OpenCascade refuses exactly that, so slightly less here)
    f42_edges = [f1_9.edges().sort_by_distance(p)[0] for p in [
        (30.914214, -9, 15.414214),
        (22, -9, 16),
        (22, -9, -2),
        (30.914214, -9, -1.414214),
        (31.5, -9, 7),
    ]]
    fillet(f42_edges, radius=F42_R)


solid = Compound([f17.part, f1_9.part])
